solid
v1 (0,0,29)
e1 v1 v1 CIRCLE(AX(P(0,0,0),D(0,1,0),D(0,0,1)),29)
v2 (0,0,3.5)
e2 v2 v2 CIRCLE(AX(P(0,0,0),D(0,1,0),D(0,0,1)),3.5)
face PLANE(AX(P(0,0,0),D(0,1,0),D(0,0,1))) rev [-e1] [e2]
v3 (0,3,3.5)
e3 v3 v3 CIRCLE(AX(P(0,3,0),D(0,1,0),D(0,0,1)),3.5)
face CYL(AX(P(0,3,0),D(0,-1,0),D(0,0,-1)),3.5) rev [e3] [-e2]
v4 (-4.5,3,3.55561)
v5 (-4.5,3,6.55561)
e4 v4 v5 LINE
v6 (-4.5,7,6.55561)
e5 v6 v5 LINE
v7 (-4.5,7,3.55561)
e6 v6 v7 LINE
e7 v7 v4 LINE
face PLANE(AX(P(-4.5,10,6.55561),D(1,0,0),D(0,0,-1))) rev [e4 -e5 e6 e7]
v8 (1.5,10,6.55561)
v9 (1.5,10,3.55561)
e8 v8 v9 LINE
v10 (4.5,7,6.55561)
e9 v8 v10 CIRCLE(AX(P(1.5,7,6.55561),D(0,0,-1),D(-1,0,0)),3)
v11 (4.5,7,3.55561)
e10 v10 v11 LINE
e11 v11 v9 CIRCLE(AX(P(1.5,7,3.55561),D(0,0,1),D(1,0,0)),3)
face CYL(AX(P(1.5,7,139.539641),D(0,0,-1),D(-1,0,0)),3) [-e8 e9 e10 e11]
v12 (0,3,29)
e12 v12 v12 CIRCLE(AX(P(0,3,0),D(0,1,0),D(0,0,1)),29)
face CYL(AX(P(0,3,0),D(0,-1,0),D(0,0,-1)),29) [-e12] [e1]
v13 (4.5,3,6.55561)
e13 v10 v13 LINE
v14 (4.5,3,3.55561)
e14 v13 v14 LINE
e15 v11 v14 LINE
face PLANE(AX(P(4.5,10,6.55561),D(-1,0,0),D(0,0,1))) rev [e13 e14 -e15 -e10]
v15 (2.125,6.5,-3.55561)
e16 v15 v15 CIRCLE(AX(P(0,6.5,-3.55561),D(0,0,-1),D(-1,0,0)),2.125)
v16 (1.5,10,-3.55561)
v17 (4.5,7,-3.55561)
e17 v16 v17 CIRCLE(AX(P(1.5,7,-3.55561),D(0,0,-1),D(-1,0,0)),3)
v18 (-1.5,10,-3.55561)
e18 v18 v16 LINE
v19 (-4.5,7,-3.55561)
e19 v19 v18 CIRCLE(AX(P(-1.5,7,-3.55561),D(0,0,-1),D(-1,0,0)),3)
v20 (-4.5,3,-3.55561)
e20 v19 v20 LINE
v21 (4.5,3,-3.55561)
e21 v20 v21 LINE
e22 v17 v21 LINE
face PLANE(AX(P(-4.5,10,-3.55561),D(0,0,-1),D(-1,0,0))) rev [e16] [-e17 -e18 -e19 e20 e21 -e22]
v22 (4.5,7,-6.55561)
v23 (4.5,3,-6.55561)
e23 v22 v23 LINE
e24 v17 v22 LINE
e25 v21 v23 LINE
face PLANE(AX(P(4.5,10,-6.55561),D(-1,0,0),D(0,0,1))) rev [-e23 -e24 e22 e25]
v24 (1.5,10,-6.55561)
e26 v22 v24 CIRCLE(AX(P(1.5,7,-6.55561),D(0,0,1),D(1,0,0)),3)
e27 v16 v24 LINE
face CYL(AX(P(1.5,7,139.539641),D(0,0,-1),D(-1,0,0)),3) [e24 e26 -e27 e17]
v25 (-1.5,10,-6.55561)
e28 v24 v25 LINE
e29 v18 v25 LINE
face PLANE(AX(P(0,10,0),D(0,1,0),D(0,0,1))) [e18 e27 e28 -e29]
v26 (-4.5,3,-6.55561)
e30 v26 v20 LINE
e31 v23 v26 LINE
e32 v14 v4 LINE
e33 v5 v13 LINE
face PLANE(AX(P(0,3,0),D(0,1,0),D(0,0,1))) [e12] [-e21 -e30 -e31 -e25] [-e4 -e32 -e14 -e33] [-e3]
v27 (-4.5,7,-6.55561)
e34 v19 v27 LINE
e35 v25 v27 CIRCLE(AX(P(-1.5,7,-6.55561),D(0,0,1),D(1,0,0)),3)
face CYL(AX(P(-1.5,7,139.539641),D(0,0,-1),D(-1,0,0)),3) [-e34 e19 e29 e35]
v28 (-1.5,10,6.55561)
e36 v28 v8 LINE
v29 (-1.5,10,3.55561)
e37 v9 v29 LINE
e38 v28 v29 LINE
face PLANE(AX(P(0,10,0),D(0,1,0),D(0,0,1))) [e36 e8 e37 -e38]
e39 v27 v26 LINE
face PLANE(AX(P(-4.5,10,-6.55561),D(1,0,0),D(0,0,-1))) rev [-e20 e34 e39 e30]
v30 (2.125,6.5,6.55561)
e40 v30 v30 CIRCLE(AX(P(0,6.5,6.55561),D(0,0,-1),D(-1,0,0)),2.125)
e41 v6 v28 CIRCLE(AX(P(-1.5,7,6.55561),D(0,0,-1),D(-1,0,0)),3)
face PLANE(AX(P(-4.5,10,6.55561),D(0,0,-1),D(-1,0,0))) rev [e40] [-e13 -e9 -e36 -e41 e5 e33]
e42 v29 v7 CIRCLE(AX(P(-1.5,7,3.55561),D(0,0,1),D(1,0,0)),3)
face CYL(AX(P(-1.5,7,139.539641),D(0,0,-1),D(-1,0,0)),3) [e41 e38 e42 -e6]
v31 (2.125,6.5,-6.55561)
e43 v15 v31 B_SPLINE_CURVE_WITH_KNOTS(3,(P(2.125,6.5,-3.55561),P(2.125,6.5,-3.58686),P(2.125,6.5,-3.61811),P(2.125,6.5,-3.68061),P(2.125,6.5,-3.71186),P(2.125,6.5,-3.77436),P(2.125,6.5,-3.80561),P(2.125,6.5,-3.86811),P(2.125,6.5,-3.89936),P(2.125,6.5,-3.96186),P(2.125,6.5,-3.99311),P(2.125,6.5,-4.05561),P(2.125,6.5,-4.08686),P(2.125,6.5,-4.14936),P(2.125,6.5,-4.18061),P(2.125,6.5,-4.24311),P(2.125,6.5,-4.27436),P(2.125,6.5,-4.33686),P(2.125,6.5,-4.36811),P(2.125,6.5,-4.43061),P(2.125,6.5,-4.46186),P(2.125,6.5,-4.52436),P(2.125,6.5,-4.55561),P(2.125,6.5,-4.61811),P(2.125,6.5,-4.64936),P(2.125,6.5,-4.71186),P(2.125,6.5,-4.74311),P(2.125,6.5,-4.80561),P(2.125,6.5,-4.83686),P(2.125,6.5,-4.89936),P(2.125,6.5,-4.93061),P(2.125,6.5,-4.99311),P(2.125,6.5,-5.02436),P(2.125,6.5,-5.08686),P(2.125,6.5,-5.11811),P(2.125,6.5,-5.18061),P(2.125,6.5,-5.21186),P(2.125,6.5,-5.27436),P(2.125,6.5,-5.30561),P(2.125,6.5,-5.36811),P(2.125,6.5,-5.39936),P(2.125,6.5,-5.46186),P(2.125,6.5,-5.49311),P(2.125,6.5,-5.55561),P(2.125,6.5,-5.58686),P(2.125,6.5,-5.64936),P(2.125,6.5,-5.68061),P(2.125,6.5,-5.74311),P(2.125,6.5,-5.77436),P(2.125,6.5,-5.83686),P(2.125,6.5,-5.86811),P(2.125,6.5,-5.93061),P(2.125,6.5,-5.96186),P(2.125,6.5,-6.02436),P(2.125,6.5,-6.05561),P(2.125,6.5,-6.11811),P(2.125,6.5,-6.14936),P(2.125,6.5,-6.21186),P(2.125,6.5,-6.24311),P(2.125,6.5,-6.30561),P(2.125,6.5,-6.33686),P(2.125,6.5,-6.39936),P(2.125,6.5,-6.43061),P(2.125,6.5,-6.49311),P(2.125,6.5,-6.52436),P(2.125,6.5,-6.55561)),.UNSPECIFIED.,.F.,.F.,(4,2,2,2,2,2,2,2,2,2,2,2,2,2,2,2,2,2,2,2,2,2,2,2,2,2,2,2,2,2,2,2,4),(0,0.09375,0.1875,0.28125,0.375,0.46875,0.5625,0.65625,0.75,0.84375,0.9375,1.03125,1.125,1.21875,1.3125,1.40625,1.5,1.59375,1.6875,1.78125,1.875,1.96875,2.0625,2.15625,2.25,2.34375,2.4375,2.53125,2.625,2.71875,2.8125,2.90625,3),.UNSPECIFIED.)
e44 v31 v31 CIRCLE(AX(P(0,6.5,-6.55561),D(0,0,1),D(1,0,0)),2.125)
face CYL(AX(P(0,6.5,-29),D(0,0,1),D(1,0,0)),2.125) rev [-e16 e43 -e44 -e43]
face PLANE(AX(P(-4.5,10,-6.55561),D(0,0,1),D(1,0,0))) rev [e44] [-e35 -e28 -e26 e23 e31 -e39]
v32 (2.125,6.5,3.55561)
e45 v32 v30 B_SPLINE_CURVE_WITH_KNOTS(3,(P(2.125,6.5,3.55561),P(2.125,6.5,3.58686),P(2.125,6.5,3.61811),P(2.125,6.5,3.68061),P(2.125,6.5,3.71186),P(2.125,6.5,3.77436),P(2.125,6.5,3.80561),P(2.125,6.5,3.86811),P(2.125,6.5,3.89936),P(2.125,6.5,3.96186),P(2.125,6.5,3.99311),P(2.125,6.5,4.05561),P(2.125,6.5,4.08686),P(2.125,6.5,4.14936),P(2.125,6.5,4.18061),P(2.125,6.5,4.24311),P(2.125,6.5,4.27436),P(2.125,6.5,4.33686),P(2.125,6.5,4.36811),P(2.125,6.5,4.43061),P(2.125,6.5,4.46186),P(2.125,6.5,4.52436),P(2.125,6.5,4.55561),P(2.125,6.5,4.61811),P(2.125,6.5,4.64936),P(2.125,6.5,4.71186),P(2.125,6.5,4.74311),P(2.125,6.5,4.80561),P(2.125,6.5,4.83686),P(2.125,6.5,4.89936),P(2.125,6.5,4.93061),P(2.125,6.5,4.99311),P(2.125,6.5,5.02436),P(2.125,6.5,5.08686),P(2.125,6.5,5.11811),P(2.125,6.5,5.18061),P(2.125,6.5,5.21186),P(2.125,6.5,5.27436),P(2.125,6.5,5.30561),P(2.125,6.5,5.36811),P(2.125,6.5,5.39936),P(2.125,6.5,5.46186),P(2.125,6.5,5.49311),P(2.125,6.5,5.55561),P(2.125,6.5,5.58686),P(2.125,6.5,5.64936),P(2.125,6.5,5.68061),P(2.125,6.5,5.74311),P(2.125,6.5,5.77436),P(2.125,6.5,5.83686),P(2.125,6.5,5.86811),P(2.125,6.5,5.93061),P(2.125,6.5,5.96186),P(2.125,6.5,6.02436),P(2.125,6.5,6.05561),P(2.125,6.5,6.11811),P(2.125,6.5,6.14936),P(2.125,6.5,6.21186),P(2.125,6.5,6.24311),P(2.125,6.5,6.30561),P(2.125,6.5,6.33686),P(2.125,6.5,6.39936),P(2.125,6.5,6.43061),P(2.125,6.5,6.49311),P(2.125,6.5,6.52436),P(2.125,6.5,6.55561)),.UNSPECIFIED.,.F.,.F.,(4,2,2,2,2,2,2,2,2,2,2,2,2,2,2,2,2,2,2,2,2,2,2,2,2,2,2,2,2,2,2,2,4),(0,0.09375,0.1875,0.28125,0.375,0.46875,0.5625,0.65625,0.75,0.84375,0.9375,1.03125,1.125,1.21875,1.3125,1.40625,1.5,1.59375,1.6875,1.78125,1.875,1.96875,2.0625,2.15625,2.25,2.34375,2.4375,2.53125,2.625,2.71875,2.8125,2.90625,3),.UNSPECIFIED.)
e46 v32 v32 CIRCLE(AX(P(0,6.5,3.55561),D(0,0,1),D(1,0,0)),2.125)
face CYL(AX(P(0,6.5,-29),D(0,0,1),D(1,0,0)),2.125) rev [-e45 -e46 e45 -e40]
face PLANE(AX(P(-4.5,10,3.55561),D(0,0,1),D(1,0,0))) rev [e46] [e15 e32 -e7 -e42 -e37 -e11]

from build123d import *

# Parameters (mm, degrees)
SKETCH1_R               = 29
SKETCH1_R_2             = 3.5
BOSS_EXTRUDE1_DEPTH     = 3
SKETCH2_W               = 9
SKETCH2_H               = 3
BOSS_EXTRUDE2_DEPTH     = 7
CUT_EXTRUDE1_DEPTH      = 43.213741838
CUT_EXTRUDE1_DEPTH_BACK = 43.213741838
SKETCH4_R               = 2.125
CUT_EXTRUDE4_START      = -6.555610355
CUT_EXTRUDE4_DEPTH      = 13.11122071


# Read off the part's stored shape, not the designer's step: Cut-Extrude4
with BuildPart() as part:
    # Sketch1 → Boss-Extrude1 (new body)
    with BuildSketch(Plane(origin=(0, 0, 0), x_dir=(1, 0, 0), z_dir=(0, 1, 0))):
        with Locations(Location((0, 0, 0), (0, 0, 270))):
            Circle(SKETCH1_R)
        with Locations(Location((0, 0, 0), (0, 0, 270))):
            Circle(SKETCH1_R_2, mode=Mode.SUBTRACT)
    extrude(amount=BOSS_EXTRUDE1_DEPTH)

    # Sketch2 → Boss-Extrude2 (add)
    with BuildSketch(Plane(origin=(0, 3, 0), x_dir=(1, 0, 0), z_dir=(0, 1, 0))):
        with Locations((0, 5.055610355)):
            Rectangle(SKETCH2_W, SKETCH2_H)
        with Locations((0, -5.055610355)):
            Rectangle(SKETCH2_W, SKETCH2_H)
    extrude(amount=BOSS_EXTRUDE2_DEPTH)

    # Sketch4 → Cut-Extrude1 (cut, two sides: drawn at the far end of the back side and taken through both)
    with BuildSketch(Plane.XY.offset(-CUT_EXTRUDE1_DEPTH_BACK)):
        with Locations((0, 6.5)):
            Circle(SKETCH4_R)
    extrude(amount=CUT_EXTRUDE1_DEPTH + CUT_EXTRUDE1_DEPTH_BACK, mode=Mode.SUBTRACT)

    # Cut-Extrude4 outline → Cut-Extrude4 (cut)
    with BuildSketch(Plane.XY.offset(CUT_EXTRUDE4_START)):
        with BuildLine():
            Line((4.5, 10), (1.5, 10))
            ThreePointArc((1.5, 10), (3.621320344, 9.121320344), (4.5, 7))
            Line((4.5, 7), (4.5, 10))
        make_face()
        with BuildLine():
            ThreePointArc((-4.5, 7), (-3.621320344, 9.121320344), (-1.5, 10))
            Line((-1.5, 10), (-4.5, 10))
            Line((-4.5, 10), (-4.5, 7))
        make_face()
    extrude(amount=CUT_EXTRUDE4_DEPTH, mode=Mode.SUBTRACT)


solid = part.part
